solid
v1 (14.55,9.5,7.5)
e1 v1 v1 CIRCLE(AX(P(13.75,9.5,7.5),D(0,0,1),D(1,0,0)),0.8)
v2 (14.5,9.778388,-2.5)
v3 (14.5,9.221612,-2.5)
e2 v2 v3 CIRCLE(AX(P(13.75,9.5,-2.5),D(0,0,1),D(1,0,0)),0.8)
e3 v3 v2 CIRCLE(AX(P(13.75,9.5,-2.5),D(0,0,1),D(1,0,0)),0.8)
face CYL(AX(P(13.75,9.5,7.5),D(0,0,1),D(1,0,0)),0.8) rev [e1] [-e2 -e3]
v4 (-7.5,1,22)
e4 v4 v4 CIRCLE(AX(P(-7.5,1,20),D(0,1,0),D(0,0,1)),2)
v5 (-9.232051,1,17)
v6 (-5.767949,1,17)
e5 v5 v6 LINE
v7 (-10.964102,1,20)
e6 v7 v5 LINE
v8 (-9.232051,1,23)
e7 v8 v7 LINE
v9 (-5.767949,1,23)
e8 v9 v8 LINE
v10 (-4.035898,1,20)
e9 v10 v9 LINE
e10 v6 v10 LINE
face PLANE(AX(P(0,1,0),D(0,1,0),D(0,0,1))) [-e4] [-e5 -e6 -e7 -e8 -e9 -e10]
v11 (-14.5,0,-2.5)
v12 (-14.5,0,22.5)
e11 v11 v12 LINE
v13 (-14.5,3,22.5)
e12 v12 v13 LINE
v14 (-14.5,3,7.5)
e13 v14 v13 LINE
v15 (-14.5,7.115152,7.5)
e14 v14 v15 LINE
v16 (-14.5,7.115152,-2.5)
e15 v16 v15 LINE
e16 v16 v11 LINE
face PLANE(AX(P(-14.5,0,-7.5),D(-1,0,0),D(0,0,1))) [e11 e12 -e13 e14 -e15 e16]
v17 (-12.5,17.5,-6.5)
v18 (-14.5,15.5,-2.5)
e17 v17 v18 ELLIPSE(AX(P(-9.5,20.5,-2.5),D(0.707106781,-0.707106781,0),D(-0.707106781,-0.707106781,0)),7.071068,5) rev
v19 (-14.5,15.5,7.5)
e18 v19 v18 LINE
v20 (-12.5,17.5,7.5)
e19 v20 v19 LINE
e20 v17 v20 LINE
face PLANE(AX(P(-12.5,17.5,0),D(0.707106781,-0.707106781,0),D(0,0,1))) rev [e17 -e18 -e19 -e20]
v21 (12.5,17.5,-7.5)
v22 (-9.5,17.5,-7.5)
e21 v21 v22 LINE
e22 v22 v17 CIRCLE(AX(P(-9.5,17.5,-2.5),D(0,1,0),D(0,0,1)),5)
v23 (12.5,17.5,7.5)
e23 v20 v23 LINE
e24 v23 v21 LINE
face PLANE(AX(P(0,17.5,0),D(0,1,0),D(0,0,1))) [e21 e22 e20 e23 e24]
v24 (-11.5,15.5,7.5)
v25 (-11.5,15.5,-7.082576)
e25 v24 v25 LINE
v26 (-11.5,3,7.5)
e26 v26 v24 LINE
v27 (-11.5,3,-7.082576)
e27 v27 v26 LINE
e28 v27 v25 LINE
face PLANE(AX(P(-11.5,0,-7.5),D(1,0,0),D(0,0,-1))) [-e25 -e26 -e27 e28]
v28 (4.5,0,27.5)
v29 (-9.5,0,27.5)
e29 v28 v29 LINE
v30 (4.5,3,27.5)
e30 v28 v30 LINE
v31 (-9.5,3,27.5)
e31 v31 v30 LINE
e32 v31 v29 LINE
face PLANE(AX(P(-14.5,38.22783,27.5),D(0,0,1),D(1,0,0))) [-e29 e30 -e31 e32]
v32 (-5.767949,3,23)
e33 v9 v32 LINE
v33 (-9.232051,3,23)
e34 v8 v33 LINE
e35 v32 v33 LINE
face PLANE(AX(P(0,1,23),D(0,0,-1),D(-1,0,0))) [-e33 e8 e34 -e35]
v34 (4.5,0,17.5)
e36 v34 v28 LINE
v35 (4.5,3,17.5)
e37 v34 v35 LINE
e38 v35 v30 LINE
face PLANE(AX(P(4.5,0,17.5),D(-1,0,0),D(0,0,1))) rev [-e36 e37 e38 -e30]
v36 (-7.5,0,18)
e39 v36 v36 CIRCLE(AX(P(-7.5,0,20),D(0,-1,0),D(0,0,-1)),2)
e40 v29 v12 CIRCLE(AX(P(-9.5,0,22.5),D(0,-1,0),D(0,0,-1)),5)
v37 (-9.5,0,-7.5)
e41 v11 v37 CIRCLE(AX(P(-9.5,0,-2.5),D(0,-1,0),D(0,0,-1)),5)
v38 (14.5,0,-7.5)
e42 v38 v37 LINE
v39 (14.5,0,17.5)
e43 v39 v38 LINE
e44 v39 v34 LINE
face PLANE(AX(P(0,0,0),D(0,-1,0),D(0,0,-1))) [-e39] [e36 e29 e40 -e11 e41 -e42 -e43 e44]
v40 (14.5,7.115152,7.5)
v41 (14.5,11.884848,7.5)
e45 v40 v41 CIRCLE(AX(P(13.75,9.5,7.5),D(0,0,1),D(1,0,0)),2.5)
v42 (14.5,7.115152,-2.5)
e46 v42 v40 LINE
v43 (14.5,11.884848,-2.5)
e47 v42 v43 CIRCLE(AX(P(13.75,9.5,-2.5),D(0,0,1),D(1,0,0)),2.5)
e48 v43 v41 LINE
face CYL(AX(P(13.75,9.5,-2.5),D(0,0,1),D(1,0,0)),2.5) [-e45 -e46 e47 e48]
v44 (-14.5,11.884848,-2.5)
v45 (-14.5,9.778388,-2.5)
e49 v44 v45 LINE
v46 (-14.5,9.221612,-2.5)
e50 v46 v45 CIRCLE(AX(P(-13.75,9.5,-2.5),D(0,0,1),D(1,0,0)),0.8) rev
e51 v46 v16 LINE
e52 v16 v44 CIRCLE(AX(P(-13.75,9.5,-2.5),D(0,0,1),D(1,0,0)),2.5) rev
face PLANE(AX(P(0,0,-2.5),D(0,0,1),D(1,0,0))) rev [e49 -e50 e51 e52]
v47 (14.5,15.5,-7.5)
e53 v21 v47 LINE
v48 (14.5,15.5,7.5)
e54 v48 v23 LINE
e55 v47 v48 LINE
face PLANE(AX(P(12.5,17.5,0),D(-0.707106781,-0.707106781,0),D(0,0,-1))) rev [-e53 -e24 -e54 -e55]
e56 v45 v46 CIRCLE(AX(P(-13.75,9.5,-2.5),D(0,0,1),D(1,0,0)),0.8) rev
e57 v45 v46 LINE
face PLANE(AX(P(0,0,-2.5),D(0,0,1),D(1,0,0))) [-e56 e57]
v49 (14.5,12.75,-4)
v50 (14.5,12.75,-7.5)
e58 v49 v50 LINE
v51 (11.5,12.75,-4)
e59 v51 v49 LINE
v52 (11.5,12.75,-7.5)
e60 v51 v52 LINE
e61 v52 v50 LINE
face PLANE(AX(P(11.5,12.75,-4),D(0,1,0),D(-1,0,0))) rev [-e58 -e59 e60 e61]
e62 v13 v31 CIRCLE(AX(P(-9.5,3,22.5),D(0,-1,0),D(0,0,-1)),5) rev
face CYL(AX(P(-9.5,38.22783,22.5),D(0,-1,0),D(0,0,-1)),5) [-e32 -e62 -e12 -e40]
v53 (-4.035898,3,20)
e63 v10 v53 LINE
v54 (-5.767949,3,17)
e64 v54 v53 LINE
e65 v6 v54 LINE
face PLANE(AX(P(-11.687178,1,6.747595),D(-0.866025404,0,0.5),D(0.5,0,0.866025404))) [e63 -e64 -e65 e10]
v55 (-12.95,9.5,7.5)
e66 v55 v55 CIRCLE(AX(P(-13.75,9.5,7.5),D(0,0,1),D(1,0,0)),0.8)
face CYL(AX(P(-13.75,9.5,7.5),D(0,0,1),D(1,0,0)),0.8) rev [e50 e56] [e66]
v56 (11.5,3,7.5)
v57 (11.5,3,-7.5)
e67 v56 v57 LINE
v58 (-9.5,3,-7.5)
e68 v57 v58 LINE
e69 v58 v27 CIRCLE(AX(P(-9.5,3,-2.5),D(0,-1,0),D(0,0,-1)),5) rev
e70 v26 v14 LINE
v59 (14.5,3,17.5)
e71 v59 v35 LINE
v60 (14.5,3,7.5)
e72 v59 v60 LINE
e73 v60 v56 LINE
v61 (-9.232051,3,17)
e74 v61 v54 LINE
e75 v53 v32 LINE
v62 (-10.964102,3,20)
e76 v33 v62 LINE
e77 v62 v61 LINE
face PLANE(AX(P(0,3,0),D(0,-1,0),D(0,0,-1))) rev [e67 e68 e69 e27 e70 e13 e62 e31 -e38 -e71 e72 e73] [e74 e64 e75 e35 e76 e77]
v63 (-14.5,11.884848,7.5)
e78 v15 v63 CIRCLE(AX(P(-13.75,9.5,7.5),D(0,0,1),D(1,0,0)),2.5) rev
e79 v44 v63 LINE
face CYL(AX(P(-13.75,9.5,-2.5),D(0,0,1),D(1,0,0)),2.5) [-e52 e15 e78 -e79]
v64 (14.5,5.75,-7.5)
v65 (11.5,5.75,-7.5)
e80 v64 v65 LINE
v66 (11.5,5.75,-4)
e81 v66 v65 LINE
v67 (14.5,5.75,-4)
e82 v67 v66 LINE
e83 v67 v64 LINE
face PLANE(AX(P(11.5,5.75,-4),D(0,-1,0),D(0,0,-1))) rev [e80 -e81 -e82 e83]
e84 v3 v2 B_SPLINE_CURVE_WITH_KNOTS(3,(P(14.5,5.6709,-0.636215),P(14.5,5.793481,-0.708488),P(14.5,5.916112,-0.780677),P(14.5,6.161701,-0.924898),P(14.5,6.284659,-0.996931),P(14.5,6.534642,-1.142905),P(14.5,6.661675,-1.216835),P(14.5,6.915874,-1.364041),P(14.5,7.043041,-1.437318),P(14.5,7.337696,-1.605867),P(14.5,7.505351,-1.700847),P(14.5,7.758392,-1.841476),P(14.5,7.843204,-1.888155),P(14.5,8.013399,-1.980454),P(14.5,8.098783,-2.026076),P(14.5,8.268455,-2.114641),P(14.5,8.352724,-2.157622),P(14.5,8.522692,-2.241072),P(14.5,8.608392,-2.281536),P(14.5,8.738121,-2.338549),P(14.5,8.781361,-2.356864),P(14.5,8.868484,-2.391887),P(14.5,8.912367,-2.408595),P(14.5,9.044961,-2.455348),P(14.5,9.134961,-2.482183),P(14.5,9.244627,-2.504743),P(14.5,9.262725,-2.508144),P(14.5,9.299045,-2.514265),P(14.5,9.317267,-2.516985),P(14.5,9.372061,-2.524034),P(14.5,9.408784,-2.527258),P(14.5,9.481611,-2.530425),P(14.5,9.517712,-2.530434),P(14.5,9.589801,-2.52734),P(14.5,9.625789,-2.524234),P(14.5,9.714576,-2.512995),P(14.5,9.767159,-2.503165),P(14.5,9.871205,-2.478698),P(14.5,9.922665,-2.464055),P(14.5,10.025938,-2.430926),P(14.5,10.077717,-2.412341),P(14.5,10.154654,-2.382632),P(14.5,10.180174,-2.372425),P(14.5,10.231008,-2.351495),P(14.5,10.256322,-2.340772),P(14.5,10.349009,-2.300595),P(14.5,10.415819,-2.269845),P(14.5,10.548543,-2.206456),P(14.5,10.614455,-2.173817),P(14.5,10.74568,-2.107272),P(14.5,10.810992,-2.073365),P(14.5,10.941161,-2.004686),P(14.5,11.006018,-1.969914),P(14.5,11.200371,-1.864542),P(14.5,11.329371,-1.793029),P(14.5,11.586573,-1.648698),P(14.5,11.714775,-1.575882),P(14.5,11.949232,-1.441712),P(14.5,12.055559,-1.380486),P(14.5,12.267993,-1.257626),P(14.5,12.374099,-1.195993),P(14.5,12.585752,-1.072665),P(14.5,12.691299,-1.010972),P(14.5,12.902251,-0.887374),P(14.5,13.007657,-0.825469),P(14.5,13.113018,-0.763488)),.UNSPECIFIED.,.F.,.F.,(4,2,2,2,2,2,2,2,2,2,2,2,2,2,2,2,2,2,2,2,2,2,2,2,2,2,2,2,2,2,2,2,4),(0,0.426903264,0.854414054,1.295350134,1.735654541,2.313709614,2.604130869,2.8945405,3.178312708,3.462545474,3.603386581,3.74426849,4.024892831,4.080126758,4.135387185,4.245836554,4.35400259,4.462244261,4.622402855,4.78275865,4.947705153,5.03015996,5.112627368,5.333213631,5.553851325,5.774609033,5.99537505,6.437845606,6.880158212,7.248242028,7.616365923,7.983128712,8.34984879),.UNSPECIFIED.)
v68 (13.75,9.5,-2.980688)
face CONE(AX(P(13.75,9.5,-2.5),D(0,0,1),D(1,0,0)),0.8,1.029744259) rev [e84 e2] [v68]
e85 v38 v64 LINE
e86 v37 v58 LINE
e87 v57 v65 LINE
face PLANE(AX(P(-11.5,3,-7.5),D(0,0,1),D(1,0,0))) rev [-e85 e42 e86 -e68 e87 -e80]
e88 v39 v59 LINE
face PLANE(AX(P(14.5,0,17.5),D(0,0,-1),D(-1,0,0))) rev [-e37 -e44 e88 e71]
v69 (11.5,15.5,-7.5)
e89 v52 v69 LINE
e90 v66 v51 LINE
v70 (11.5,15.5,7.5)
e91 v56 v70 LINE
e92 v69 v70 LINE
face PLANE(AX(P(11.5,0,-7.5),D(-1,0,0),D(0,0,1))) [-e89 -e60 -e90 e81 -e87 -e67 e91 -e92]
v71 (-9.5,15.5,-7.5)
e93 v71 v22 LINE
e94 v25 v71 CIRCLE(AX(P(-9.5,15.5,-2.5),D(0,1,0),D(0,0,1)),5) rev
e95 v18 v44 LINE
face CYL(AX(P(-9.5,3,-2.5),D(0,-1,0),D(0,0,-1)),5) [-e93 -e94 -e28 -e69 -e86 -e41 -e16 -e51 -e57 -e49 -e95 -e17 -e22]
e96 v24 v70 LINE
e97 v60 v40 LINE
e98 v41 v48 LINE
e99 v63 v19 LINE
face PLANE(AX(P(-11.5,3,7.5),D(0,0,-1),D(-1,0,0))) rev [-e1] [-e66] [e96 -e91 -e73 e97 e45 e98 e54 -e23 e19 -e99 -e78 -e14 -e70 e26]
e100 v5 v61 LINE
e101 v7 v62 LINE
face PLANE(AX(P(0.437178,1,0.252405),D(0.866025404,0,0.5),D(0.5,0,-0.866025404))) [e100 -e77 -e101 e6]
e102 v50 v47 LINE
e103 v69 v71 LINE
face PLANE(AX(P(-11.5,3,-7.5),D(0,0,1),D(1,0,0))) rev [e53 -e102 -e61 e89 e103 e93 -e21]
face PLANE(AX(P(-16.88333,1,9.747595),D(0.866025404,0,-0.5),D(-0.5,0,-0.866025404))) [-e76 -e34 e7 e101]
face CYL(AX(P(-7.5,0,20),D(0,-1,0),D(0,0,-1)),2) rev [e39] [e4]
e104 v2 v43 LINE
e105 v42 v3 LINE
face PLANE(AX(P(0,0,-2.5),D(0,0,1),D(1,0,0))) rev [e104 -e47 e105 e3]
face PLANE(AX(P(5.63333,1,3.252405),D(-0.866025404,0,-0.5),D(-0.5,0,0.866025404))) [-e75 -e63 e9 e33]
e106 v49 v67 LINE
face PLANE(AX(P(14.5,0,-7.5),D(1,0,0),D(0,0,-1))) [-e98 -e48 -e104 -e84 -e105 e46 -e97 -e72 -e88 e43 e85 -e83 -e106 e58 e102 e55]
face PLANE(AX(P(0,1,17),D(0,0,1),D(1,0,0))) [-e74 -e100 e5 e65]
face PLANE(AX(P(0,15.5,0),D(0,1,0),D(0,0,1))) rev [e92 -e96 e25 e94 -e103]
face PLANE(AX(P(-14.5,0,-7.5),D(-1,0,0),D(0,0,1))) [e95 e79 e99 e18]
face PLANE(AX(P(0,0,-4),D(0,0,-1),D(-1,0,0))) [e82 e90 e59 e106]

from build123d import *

# Parameters (mm, degrees)
SKETCH1_W                           = 23
SKETCH1_H                           = 15
BOSS_EXTRUDE1_DEPTH                 = 3
BOSS_EXTRUDE2_DEPTH                 = 12.5
BOSS_EXTRUDE2_DEPTH_BACK            = 3
SKETCH2_W                           = 3
SKETCH2_H                           = 15
BOSS_EXTRUDE3_DEPTH                 = 10
TAP_START                           = -2.5
TAP_DRILL_FOR_M2X0_4_TAP1_OUTLINE_R = 0.8
TAP_DRILL_FOR_M2X0_4_TAP1_DEPTH     = 10
SKETCH6_W                           = 29
SKETCH6_H                           = 20
BOSS_EXTRUDE4_DEPTH                 = 3
SKETCH7_W                           = 10
SKETCH7_H                           = 10
CUT_EXTRUDE1_DEPTH                  = 35.301056835
CUT_EXTRUDE2_DEPTH                  = 2
F_4_0_4_DIAMETER_HOLE1_D            = 4
F_4_0_4_DIAMETER_HOLE1_DEPTH        = 10
F_4_0_4_DIAMETER_HOLE1_TIP          = 1.201721238
SKETCH12_W                          = 29
SKETCH12_H                          = 15
BOSS_EXTRUDE5_DEPTH                 = 2
SKETCH13_W                          = 3
SKETCH13_H                          = 7
CUT_EXTRUDE4_DEPTH                  = 3.5
CHAMFER1_SIZE                       = 2
FILLET1_R                           = 5


# Read off the part's stored shape, not the designer's step: Tap Drill for M2x0.4 Tap1
with BuildPart() as part:
    # Sketch1 → Boss-Extrude1 (new body)
    with BuildSketch(Plane(origin=(0, 0, 0), x_dir=(1, 0, 0), z_dir=(0, 1, 0))):
        Rectangle(SKETCH1_W, SKETCH1_H)
    extrude(amount=BOSS_EXTRUDE1_DEPTH)

    # Sketch2 → Boss-Extrude2 (add, two sides: drawn at the far end of the back side and taken through both)
    with BuildSketch(Plane(origin=(0, 3, 0), x_dir=(1, 0, 0), z_dir=(0, 1, 0)).offset(-BOSS_EXTRUDE2_DEPTH_BACK)):
        with Locations((13, 0)):
            Rectangle(SKETCH2_W, SKETCH2_H)
        with Locations((-13, 0)):
            Rectangle(SKETCH2_W, SKETCH2_H)
    extrude(amount=BOSS_EXTRUDE2_DEPTH + BOSS_EXTRUDE2_DEPTH_BACK)

    # Sketch3 → Boss-Extrude3 (add)
    with BuildSketch(Plane.XY.offset(7.5)):
        with BuildLine():
            ThreePointArc((16.25, 9.5), (15.765564437, 10.979019946), (14.5, 11.884848004))
            Line((14.5, 11.884848004), (14.5, 7.115151996))
            ThreePointArc((14.5, 7.115151996), (15.765564437, 8.020980054), (16.25, 9.5))
        make_face()
        with BuildLine():
            Line((-14.5, 7.115151996), (-14.5, 11.884848004))
            ThreePointArc((-14.5, 11.884848004), (-16.25, 9.5), (-14.5, 7.115151996))
        make_face()
    extrude(amount=-BOSS_EXTRUDE3_DEPTH)

    # Tap Drill for M2x0.4 Tap1 outline → Tap Drill for M2x0.4 Tap1 (cut)
    with BuildSketch(Plane.XY.offset(TAP_START)):
        with Locations((-13.75, 9.5)):
            Circle(TAP_DRILL_FOR_M2X0_4_TAP1_OUTLINE_R)
    extrude(amount=TAP_DRILL_FOR_M2X0_4_TAP1_DEPTH, mode=Mode.SUBTRACT)

    # Tap Drill for M2x0.4 Tap1 2 outline → Tap Drill for M2x0.4 Tap1 2 (revolve, cut)
    with BuildSketch(Plane(origin=(13.75, 9.5, 0), x_dir=(1, 0, 0), z_dir=(0, -1, 0))):
        Polygon((0, 7.5), (0, -2.980688495), (0.800001695, -2.499998981), (0.8, 7.5), align=None)
    revolve(axis=Axis((13.75, 9.5, 0), (0, 0, 1)), mode=Mode.SUBTRACT)

    # Sketch6 → Boss-Extrude4 (add)
    with BuildSketch(Plane.XZ):
        with Locations((0, 17.5)):
            Rectangle(SKETCH6_W, SKETCH6_H)
    extrude(amount=-BOSS_EXTRUDE4_DEPTH)

    # Sketch7 → Cut-Extrude1 (cut, through all)
    with BuildSketch(Plane(origin=(0, 3, 0), x_dir=(1, 0, 0), z_dir=(0, 1, 0))):
        with Locations((9.5, -22.5)):
            Rectangle(SKETCH7_W, SKETCH7_H)
    extrude(amount=-CUT_EXTRUDE1_DEPTH, mode=Mode.SUBTRACT)

    # Sketch8 → Cut-Extrude2 (cut)
    with BuildSketch(Plane.XZ.offset(-3)):
        Polygon((-5.767949192, 17), (-4.035898385, 20), (-5.767949192, 23), (-9.232050808, 23), (-10.964101615, 20), (-9.232050808, 17), align=None)
    extrude(amount=CUT_EXTRUDE2_DEPTH, mode=Mode.SUBTRACT)

    # Ø4.0 (4) Diameter Hole1
    with Locations(Plane(origin=(0, 0, 0), x_dir=(-1, 0, 0), z_dir=(0, -1, 0))):
        with Locations((7.5, -20)):
            Hole(F_4_0_4_DIAMETER_HOLE1_D / 2, depth=F_4_0_4_DIAMETER_HOLE1_DEPTH)
            with Locations((0, 0, -(F_4_0_4_DIAMETER_HOLE1_DEPTH + F_4_0_4_DIAMETER_HOLE1_TIP / 2))):  # 118° drill point
                Cone(0, F_4_0_4_DIAMETER_HOLE1_D / 2, F_4_0_4_DIAMETER_HOLE1_TIP, mode=Mode.SUBTRACT)

    # Sketch12 → Boss-Extrude5 (add)
    with BuildSketch(Plane(origin=(0, 15.5, 0), x_dir=(1, 0, 0), z_dir=(0, 1, 0))):
        Rectangle(SKETCH12_W, SKETCH12_H)
    extrude(amount=BOSS_EXTRUDE5_DEPTH)

    # Sketch13 → Cut-Extrude4 (cut)
    with BuildSketch(Plane(origin=(0, 0, -7.5), x_dir=(-1, 0, 0), z_dir=(0, 0, -1))):
        with Locations((-13, 9.25)):
            Rectangle(SKETCH13_W, SKETCH13_H)
    extrude(amount=-CUT_EXTRUDE4_DEPTH, mode=Mode.SUBTRACT)

    # Chamfer1
    chamfer1_edges = [part.edges().sort_by_distance(p)[0] for p in [
        (-14.5, 17.5, 0),
        (14.5, 17.5, 0),
    ]]
    chamfer(chamfer1_edges, length=CHAMFER1_SIZE)

    # Fillet1
    # the kernel refuses this fillet: 5 mm, written as the material it takes off along each edge
    with BuildSketch(Plane(origin=(-14.5, -12.5, 27.5), x_dir=(0, 0, -1), z_dir=(0, 1, 0))) as fillet1_piece_1:
        with BuildLine():
            CenterArc((FILLET1_R, -FILLET1_R), FILLET1_R, 90, 90)
            Line((0, -FILLET1_R), (0, 0))
            Line((0, 0), (FILLET1_R, 0))
        make_face()
    extrude(amount=28, mode=Mode.SUBTRACT)
    with BuildSketch(Plane(origin=(-14.5, 28, -7.5), x_dir=(0, 0, 1), z_dir=(0, -1, 0))) as fillet1_piece_2:
        with BuildLine():
            CenterArc((FILLET1_R, -FILLET1_R), FILLET1_R, 90, 90)
            Line((0, -FILLET1_R), (0, 0))
            Line((0, 0), (FILLET1_R, 0))
        make_face()
    extrude(amount=40.5, mode=Mode.SUBTRACT)


solid = part.part
